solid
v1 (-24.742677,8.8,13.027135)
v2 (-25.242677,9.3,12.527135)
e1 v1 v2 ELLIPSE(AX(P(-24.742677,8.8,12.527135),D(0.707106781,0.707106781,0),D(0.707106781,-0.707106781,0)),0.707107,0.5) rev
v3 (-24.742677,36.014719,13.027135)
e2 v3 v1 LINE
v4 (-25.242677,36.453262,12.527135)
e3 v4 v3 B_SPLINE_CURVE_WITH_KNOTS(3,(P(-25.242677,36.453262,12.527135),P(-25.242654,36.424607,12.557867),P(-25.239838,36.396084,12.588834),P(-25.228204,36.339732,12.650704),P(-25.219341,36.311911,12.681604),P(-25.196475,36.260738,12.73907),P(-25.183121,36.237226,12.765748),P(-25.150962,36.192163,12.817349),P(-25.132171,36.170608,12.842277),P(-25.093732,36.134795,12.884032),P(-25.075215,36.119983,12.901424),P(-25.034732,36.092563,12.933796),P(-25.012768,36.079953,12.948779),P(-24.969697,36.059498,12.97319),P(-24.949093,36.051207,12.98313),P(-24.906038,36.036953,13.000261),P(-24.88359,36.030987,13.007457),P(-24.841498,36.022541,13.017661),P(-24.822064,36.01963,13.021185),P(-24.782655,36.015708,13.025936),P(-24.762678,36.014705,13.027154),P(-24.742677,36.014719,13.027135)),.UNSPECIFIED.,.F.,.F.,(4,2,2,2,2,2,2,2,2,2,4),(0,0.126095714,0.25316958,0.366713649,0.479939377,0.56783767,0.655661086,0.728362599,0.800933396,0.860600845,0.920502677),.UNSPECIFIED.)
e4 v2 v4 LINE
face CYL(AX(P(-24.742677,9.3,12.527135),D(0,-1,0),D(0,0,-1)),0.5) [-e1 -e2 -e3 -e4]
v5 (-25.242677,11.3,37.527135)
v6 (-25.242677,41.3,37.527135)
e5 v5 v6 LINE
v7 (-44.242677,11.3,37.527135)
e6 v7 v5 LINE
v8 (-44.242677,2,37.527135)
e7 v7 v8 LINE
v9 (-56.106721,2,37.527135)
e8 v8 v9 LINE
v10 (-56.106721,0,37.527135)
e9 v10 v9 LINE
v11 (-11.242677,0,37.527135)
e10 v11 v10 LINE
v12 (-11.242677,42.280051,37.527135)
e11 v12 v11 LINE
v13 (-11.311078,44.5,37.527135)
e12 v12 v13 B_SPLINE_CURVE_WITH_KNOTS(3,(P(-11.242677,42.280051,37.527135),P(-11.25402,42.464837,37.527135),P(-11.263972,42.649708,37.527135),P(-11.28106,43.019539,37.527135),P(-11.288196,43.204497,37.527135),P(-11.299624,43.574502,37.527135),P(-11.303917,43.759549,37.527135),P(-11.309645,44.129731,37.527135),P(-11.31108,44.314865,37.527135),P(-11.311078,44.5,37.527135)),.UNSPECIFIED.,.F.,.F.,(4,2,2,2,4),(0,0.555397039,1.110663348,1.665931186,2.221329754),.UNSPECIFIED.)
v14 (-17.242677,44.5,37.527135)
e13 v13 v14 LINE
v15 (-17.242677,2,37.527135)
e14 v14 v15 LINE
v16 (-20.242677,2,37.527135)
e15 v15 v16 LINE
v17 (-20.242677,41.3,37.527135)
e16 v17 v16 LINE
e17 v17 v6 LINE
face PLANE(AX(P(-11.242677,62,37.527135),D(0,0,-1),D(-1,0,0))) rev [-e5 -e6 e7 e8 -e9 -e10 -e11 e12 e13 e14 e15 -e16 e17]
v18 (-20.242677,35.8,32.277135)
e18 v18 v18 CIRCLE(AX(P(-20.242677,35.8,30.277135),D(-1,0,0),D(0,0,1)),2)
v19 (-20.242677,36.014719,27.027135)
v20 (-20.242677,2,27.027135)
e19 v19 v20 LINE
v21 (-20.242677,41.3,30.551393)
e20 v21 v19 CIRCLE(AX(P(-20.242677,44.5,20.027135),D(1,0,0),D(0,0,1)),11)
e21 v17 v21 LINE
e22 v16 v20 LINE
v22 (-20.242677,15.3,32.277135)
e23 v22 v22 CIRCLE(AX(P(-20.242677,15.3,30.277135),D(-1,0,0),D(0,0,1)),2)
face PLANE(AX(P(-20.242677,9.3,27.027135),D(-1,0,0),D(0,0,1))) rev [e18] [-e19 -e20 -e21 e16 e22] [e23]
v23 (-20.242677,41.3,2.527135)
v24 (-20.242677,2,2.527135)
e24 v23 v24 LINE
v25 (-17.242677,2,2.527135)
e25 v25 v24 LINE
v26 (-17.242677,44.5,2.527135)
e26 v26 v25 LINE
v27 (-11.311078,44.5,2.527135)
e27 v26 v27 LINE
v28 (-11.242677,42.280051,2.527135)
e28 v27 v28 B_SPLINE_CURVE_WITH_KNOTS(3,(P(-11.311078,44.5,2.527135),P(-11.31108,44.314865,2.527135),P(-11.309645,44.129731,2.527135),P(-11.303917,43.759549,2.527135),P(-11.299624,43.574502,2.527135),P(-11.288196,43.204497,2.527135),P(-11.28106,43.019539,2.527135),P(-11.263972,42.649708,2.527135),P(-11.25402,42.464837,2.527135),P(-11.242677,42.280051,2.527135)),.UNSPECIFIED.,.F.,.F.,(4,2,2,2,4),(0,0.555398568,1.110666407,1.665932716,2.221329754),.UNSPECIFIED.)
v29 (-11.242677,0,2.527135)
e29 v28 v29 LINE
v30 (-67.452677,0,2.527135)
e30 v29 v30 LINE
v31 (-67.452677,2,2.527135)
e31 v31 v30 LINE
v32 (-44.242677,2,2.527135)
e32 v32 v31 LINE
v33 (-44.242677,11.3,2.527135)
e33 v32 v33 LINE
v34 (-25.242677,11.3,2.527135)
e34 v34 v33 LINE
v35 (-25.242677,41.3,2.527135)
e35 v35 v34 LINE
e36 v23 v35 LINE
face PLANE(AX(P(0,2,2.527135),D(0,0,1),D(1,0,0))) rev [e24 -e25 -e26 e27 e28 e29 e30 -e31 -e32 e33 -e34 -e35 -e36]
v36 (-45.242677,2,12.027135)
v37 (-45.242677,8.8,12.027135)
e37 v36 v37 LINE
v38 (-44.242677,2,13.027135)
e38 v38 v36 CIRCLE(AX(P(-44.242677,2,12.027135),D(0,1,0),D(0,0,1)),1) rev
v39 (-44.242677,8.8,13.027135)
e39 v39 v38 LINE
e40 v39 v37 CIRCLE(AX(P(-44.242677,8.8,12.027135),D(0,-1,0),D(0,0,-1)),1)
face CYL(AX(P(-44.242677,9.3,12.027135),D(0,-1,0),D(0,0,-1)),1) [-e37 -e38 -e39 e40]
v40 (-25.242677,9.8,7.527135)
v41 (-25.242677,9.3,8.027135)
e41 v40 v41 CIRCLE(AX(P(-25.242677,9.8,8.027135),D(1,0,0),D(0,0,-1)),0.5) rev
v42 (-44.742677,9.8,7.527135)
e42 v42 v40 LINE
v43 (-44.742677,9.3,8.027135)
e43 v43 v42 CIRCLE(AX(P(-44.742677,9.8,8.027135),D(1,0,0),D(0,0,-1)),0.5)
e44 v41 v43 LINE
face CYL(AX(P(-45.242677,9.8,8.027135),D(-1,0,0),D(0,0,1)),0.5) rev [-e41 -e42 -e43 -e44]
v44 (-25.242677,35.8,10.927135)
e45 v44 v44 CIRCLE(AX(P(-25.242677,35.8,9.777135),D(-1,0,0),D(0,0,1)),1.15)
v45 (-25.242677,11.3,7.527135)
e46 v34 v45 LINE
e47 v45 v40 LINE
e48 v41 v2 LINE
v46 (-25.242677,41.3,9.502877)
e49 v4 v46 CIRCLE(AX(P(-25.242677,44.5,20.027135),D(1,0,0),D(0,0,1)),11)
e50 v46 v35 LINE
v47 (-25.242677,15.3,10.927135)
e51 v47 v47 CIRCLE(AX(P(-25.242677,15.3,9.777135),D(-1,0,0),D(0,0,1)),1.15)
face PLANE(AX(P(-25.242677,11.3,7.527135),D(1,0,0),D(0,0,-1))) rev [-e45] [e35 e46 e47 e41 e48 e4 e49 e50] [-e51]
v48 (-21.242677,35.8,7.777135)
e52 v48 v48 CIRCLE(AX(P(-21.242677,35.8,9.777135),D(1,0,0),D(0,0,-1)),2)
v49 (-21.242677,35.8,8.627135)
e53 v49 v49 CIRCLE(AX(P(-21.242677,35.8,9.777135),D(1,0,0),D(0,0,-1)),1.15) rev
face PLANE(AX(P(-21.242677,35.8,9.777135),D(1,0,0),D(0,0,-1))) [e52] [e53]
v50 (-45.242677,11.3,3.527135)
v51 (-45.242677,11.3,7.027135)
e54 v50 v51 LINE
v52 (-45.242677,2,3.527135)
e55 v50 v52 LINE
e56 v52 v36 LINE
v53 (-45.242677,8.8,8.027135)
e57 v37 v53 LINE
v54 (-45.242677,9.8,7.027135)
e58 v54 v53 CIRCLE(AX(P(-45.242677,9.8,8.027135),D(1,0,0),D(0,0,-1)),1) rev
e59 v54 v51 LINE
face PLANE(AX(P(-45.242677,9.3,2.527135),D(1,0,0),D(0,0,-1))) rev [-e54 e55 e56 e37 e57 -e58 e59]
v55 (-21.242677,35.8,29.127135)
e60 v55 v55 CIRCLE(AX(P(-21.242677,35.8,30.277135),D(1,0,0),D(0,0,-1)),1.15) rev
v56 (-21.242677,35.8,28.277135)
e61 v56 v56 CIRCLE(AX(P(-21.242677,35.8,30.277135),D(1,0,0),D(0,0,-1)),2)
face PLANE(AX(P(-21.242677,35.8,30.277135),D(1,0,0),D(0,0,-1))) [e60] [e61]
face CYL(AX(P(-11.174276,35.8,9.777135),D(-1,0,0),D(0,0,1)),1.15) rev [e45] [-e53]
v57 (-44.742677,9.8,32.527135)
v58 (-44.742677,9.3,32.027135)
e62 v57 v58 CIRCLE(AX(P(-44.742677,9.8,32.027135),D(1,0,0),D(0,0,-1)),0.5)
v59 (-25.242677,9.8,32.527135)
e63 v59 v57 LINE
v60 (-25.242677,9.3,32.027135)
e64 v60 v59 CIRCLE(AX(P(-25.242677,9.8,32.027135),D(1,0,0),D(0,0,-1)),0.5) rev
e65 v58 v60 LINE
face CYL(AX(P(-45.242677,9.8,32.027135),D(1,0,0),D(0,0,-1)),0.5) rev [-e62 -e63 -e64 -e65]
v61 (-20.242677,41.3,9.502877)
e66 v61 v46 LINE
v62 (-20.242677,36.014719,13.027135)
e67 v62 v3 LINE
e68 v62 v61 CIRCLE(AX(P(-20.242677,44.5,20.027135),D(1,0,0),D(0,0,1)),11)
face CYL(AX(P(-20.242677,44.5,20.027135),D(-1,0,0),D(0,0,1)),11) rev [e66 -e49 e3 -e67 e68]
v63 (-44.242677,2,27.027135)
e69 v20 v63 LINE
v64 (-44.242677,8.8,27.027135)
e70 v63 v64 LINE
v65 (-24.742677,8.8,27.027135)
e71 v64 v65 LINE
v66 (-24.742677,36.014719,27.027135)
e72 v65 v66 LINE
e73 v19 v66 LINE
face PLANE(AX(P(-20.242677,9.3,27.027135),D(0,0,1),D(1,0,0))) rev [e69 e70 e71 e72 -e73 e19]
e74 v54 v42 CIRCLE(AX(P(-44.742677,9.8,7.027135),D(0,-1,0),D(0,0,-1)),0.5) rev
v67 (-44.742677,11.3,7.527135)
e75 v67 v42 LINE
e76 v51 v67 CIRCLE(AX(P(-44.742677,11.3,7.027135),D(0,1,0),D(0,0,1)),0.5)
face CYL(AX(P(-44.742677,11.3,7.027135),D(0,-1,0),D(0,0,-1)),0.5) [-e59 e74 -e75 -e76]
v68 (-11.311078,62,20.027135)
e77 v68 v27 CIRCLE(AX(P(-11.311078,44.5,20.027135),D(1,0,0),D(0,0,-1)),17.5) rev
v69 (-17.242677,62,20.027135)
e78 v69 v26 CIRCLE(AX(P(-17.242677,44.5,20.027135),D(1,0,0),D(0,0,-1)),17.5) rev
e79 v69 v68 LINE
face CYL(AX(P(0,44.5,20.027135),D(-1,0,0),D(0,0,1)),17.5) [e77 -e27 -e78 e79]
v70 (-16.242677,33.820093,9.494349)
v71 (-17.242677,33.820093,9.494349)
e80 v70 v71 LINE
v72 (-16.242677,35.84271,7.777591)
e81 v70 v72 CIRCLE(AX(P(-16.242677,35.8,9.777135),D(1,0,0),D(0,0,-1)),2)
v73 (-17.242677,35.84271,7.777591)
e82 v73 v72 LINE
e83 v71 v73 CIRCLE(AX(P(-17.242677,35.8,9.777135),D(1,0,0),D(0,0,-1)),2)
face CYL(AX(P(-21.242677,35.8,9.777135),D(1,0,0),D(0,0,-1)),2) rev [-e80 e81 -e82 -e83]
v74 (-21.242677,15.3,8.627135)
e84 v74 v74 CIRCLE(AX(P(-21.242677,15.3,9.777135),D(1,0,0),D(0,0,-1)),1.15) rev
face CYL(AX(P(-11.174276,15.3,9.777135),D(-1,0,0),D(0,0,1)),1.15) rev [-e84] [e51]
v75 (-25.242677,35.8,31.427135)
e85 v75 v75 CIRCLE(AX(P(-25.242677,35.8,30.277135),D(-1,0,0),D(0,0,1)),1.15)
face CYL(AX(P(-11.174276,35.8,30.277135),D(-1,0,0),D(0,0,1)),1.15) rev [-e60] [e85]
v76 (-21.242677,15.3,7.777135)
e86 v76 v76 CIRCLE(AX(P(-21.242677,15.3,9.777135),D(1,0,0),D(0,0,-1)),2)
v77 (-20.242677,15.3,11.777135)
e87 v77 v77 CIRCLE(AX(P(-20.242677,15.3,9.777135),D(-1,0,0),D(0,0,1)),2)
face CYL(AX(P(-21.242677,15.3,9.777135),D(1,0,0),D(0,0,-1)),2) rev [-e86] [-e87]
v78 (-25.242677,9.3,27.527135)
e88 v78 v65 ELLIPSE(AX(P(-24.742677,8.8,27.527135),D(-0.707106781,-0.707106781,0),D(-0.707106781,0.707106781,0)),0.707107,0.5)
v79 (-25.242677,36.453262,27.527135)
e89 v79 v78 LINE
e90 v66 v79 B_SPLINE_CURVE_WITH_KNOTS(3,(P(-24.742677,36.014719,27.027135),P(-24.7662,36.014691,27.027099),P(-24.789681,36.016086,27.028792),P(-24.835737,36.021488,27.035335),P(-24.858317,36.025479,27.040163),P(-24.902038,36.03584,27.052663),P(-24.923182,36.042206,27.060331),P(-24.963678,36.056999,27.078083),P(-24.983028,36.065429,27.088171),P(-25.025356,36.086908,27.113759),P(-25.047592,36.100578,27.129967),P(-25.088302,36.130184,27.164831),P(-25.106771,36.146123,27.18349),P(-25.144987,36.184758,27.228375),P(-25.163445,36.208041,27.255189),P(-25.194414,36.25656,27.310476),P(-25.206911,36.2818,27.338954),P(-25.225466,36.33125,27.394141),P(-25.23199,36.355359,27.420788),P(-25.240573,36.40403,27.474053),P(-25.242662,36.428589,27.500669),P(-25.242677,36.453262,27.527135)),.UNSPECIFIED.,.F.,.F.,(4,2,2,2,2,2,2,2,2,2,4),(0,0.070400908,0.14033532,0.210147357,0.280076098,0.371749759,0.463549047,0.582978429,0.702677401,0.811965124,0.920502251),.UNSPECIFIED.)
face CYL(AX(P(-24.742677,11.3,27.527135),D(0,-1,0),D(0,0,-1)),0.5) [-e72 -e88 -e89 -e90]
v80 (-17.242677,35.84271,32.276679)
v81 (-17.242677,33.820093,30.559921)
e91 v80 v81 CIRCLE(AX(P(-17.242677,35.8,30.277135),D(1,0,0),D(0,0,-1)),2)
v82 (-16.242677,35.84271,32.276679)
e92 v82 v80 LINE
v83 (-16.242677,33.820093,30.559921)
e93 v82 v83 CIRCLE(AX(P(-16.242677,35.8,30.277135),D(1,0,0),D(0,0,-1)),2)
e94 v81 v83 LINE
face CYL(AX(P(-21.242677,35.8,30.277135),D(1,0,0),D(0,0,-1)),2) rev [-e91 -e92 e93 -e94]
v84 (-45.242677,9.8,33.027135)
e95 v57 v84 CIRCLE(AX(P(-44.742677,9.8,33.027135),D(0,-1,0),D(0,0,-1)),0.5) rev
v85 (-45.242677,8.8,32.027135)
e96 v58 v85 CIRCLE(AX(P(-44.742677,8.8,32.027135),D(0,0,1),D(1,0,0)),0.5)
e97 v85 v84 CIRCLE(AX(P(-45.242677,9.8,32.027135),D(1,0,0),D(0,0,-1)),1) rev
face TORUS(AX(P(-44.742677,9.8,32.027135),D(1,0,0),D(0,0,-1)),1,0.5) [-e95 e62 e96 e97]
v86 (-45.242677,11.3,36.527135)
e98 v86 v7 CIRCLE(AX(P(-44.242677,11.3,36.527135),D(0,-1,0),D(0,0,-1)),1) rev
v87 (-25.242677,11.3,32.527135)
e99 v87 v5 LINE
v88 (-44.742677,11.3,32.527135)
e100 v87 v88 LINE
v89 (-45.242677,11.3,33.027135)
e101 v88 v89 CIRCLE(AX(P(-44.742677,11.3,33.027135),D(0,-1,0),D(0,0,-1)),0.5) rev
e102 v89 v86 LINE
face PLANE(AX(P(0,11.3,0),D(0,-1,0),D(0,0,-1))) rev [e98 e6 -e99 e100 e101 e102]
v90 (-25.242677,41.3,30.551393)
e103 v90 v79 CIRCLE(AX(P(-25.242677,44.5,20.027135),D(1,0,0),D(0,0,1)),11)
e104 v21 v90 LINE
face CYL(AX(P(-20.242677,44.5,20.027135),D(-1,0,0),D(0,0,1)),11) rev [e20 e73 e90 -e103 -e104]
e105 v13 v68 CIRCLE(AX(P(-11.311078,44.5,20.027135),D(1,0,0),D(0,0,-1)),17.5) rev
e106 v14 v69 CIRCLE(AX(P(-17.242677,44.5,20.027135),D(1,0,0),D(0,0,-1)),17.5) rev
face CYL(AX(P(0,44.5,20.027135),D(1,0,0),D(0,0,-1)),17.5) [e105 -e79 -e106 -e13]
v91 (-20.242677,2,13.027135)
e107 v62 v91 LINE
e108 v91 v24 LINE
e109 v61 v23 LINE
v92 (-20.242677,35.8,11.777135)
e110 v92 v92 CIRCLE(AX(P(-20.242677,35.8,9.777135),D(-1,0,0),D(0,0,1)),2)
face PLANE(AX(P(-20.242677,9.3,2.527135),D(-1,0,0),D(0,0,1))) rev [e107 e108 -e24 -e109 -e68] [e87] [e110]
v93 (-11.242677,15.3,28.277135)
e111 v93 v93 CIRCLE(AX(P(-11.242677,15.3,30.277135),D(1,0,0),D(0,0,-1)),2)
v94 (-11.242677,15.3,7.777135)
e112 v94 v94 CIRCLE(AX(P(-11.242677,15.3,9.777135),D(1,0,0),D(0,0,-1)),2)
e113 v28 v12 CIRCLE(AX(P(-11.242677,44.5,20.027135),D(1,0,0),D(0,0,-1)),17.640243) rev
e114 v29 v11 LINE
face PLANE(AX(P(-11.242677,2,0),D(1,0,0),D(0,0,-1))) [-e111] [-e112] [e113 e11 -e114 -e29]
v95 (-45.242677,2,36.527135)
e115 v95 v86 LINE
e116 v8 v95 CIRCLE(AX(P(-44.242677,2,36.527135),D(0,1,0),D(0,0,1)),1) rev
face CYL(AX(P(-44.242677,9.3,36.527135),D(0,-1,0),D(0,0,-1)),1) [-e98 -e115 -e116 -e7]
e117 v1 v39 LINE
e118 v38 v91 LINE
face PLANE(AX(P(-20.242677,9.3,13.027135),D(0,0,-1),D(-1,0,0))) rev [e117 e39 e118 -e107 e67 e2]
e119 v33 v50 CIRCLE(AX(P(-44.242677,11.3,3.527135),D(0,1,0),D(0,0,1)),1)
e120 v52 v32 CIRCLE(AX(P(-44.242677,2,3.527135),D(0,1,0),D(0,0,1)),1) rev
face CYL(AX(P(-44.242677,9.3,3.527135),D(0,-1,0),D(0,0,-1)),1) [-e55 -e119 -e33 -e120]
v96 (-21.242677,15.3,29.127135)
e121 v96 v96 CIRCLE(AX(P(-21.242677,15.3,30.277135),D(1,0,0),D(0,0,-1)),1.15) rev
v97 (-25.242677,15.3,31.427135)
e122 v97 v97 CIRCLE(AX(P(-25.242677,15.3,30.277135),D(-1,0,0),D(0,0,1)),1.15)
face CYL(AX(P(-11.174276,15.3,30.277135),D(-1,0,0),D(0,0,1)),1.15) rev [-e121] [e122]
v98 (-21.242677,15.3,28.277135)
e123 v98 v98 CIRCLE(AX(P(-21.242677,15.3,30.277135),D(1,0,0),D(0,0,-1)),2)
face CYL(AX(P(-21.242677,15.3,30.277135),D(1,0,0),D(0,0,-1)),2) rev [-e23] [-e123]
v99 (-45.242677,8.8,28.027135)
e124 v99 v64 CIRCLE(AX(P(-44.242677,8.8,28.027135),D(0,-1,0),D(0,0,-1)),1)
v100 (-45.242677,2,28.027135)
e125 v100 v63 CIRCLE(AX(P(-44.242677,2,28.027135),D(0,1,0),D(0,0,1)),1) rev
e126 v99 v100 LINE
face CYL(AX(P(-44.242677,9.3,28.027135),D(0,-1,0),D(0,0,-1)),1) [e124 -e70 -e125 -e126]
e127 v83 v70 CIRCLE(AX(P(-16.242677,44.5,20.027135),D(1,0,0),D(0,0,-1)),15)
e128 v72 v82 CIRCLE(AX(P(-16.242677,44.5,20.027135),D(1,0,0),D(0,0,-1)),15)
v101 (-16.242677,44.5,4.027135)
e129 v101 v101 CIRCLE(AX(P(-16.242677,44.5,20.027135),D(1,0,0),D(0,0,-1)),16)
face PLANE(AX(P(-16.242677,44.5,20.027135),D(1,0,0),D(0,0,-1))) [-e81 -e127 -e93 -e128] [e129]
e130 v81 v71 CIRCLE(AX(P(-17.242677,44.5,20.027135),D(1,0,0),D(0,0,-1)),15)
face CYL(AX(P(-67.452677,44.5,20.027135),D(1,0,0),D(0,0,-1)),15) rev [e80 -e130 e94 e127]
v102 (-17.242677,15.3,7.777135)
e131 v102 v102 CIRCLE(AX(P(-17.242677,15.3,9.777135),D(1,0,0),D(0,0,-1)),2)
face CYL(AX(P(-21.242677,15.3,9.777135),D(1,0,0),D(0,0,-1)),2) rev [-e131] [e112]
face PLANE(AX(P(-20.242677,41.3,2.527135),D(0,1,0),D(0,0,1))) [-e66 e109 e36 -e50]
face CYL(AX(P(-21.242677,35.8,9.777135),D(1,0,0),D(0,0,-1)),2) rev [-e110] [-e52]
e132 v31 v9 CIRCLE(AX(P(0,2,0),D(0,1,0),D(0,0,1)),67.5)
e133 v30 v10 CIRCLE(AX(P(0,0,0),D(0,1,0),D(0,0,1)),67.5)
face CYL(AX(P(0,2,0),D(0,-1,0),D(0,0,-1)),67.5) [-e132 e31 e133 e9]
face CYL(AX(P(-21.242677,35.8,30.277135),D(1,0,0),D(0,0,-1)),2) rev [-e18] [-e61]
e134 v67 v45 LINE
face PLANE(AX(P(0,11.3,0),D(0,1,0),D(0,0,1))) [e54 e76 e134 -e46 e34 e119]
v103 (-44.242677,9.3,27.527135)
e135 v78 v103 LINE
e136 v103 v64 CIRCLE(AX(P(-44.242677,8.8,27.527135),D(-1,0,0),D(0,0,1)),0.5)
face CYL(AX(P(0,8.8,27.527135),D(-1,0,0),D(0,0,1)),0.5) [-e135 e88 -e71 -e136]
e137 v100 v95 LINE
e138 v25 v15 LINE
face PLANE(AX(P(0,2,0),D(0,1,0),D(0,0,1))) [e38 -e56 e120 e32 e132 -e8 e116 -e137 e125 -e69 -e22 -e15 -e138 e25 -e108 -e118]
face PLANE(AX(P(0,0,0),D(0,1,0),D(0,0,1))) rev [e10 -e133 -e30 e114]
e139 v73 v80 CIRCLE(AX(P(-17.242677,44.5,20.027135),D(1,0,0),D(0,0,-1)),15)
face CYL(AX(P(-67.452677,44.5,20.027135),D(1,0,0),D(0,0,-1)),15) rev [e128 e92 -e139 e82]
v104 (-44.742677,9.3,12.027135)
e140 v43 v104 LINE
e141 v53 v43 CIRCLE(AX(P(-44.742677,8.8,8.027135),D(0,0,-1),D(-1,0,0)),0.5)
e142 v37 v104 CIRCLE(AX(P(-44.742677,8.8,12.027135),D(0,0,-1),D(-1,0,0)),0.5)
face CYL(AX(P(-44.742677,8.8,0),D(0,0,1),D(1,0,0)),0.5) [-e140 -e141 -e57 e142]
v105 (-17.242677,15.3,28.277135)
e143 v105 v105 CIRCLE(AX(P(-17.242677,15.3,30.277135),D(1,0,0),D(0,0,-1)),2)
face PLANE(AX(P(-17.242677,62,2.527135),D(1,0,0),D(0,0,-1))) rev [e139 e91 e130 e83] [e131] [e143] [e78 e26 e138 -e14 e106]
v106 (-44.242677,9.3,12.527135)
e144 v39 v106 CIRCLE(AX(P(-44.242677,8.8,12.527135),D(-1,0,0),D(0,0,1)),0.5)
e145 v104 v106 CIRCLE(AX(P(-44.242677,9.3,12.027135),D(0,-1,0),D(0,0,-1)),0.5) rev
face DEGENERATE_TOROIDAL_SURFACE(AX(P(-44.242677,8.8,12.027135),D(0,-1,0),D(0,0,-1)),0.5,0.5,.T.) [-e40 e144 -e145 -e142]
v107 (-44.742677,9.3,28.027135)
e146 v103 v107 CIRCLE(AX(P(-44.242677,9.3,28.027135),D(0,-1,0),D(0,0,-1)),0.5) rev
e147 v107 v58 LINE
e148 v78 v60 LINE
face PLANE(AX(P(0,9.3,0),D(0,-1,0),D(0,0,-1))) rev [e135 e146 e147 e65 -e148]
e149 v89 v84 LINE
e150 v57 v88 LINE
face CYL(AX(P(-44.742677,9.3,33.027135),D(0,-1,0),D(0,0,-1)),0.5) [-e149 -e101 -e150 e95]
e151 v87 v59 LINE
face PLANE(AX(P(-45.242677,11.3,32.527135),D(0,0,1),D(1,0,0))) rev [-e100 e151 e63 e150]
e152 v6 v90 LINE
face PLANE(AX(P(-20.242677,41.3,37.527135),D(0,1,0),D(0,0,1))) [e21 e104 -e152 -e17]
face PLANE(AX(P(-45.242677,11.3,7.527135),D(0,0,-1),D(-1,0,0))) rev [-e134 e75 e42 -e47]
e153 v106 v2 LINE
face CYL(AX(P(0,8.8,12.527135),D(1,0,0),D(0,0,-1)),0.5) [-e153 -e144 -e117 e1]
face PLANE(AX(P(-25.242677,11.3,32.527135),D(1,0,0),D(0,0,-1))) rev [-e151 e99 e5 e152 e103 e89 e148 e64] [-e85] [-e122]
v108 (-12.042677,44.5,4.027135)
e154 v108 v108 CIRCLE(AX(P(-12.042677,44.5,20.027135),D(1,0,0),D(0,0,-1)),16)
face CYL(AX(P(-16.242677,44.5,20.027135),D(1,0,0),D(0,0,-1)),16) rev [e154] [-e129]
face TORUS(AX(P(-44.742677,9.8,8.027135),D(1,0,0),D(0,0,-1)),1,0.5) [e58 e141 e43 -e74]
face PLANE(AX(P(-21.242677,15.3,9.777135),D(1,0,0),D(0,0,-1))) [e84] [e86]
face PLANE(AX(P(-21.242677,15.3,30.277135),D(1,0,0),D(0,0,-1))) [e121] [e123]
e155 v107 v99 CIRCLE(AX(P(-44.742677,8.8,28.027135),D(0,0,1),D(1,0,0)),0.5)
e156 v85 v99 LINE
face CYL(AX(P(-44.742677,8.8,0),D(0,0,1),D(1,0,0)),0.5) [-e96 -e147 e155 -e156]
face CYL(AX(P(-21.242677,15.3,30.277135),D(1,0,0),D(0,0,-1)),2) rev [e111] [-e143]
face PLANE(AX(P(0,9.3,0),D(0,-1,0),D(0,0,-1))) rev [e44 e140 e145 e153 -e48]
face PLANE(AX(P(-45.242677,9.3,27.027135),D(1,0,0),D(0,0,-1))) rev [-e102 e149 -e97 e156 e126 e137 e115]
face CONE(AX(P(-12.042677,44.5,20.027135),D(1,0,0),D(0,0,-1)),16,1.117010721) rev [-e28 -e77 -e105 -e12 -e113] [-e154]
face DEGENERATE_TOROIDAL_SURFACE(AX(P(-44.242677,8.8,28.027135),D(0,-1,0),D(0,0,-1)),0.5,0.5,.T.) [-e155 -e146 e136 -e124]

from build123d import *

# Parameters (mm, degrees)
EXTRUDE_1_DEPTH     = 2
SKETCH_2_W          = 6
SKETCH_2_H          = 35
EXTRUDE_2_DEPTH     = 60
FILLET_1_R          = 17.5
SKETCH_3_R          = 16
CUT_EXTRUDE_1_DEPTH = 5
CHAMFER_1_SIZE      = 1.640243073
CHAMFER_1_SIZE_2    = 0.8
SKETCH_4_R          = 15
CUT_EXTRUDE_2_DEPTH = 105.385422037
SKETCH_5_W          = 25
SKETCH_5_H          = 10.5
EXTRUDE_3_DEPTH     = 7.3
EXTRUDE_4_DEPTH     = 2
FILLET_2_R          = 1
EXTRUDE_5_DEPTH     = 5
SKETCH_9_R          = 1.15
CUT_EXTRUDE_3_DEPTH = 101.277297201
SKETCH_10_R         = 2
CUT_EXTRUDE_4_DEPTH = 10
FILLET_3_R          = 0.5
SKETCH_12_W         = 56.21
SKETCH_12_H         = 29.03
CUT_EXTRUDE_5_DEPTH = 113.159332301


# Some blends are built 0.0001 mm under size
with BuildPart() as part:
    # 스케치1 → 보스-돌출1 (new body)
    with BuildSketch(Plane(origin=(0, 0, 0), x_dir=(1, 0, 0), z_dir=(0, 1, 0))):
        with BuildLine():
            Line((-11.24267666, -2.527135016), (-67.45267666, -2.527135016))
            ThreePointArc((-67.45267666, -2.527135016), (-50.72671765, -44.531450868), (-11.24267666, -66.557135016))
            Line((-11.24267666, -66.557135016), (-11.24267666, -2.527135016))
        make_face()
    extrude(amount=EXTRUDE_1_DEPTH)

    # 스케치2 → 보스-돌출2 (add)
    with BuildSketch(Plane(origin=(0, 2, 0), x_dir=(1, 0, 0), z_dir=(0, 1, 0))):
        with Locations((-14.24267666, -20.027135016)):
            Rectangle(SKETCH_2_W, SKETCH_2_H)
    extrude(amount=EXTRUDE_2_DEPTH)

    # 필렛1
    fillet_1_edges = [part.edges().sort_by_distance(p)[0] for p in [
        (-14.24267666, 62, 2.527135016),
        (-14.24267666, 62, 37.527135016),
    ]]
    fillet(fillet_1_edges, radius=FILLET_1_R - 0.0001)  # a hair under: the kernel refuses the full size

    # 스케치3 → 컷-돌출1 (cut)
    with BuildSketch(Plane(origin=(-11.24267666, 0, 0), x_dir=(0, 0, -1), z_dir=(1, 0, 0))):
        with Locations((-20.027135016, 44.5)):
            Circle(SKETCH_3_R)
    extrude(amount=-CUT_EXTRUDE_1_DEPTH, mode=Mode.SUBTRACT)

    # 모따기1
    # the kernel refuses this chamfer: 1.640243073, 0.8 mm, written as the material it takes off along each edge
    with BuildSketch(Plane(origin=(-11.24267666, 44.5, 20.027135016), x_dir=(0, 0, -1), z_dir=(0, -1, 0))) as chamfer_1_piece_1:
        Polygon((16 + CHAMFER_1_SIZE, 0), (16, -CHAMFER_1_SIZE_2), (16, 0), align=None)
    revolve(axis=Axis((-11.24267666, 44.5, 20.027135016), (1, 0, 0)), mode=Mode.SUBTRACT)

    # 스케치4 → 컷-돌출2 (cut, through all)
    with BuildSketch(Plane(origin=(-16.24267666, 0, 0), x_dir=(0, 0, -1), z_dir=(1, 0, 0))):
        with Locations((-20.027135016, 44.5)):
            Circle(SKETCH_4_R)
    extrude(amount=-CUT_EXTRUDE_2_DEPTH, mode=Mode.SUBTRACT)

    # 스케치5 → 보스-돌출3 (add)
    with BuildSketch(Plane(origin=(0, 2, 0), x_dir=(1, 0, 0), z_dir=(0, 1, 0))):
        with Locations((-32.74267666, -7.777135016)):
            Rectangle(SKETCH_5_W, SKETCH_5_H)
        with Locations((-32.74267666, -32.277135016)):
            Rectangle(SKETCH_5_W, SKETCH_5_H)
    extrude(amount=EXTRUDE_3_DEPTH)

    # 스케치6 → 보스-돌출4 (add)
    with BuildSketch(Plane(origin=(0, 9.3, 0), x_dir=(1, 0, 0), z_dir=(0, 1, 0))):
        Polygon((-45.24267666, -32.527135016), (-25.24267666, -32.527135016), (-25.24267666, -27.027135016), (-20.24267666, -27.027135016), (-20.24267666, -37.527135016), (-45.24267666, -37.527135016), align=None)
        Polygon((-45.24267666, -2.527135016), (-20.24267666, -2.527135016), (-20.24267666, -13.027135016), (-25.24267666, -13.027135016), (-25.24267666, -7.527135016), (-45.24267666, -7.527135016), align=None)
    extrude(amount=EXTRUDE_4_DEPTH)

    # 필렛2
    fillet_2_edges = [part.edges().sort_by_distance(p)[0] for p in [
        (-45.24267666, 6.65, 2.527135016),
        (-45.24267666, 5.65, 13.027135016),
        (-45.24267666, 5.65, 27.027135016),
        (-45.24267666, 6.65, 37.527135016),
    ]]
    fillet(fillet_2_edges, radius=FILLET_2_R)

    # 스케치7 → 보스-돌출5 (add)
    with BuildSketch(Plane.ZY.offset(25.24267666)):
        with BuildLine():
            Line((2.527135016, 11.3), (13.027135016, 11.3))
            Line((13.027135016, 11.3), (13.027135016, 36.014718626))
            ThreePointArc((13.027135016, 36.014718626), (10.875170651, 38.397414624), (9.502877322, 41.3))
            Line((9.502877322, 41.3), (2.527135016, 41.3))
            Line((2.527135016, 41.3), (2.527135016, 11.3))
        make_face()
        with BuildLine():
            Line((37.527135016, 11.3), (27.027135016, 11.3))
            Line((27.027135016, 11.3), (27.027135016, 36.014718626))
            ThreePointArc((27.027135016, 36.014718626), (29.17909938, 38.397414624), (30.551392709, 41.3))
            Line((30.551392709, 41.3), (37.527135016, 41.3))
            Line((37.527135016, 41.3), (37.527135016, 11.3))
        make_face()
    extrude(amount=-EXTRUDE_5_DEPTH)

    # 스케치9 → 컷-돌출3 (cut, through all)
    with BuildSketch(Plane.ZY.offset(25.24267666)):
        with Locations((9.777135016, 35.8)):
            Circle(SKETCH_9_R)
        with Locations((9.777135016, 15.3)):
            Circle(SKETCH_9_R)
        with Locations((30.277135016, 15.3)):
            Circle(SKETCH_9_R)
        with Locations((30.277135016, 35.8)):
            Circle(SKETCH_9_R)
    extrude(amount=-CUT_EXTRUDE_3_DEPTH, mode=Mode.SUBTRACT)

    # 스케치10 → 컷-돌출4 (cut)
    with BuildSketch(Plane(origin=(-11.24267666, 0, 0), x_dir=(0, 0, -1), z_dir=(1, 0, 0))):
        with Locations((-30.277135016, 15.3)):
            Circle(SKETCH_10_R)
        with Locations((-9.777135016, 15.3)):
            Circle(SKETCH_10_R)
        with Locations((-9.777135016, 35.8)):
            Circle(SKETCH_10_R)
        with Locations((-30.277135016, 35.8)):
            Circle(SKETCH_10_R)
    extrude(amount=-CUT_EXTRUDE_4_DEPTH, mode=Mode.SUBTRACT)

    # 필렛3
    fillet_3_edges = [part.edges().sort_by_distance(p)[0] for p in [
        (-45.24267666, 10.3, 32.527135016),
        (-25.24267666, 22.657359313, 27.027135016),
        (-35.24267666, 9.3, 32.527135016),
        (-45.24267666, 9.3, 30.277135016),
        (-44.949783441, 9.3, 27.320028235),
        (-34.74267666, 9.3, 13.027135016),
        (-44.949783441, 9.3, 12.734241797),
        (-45.24267666, 9.3, 9.777135016),
        (-35.24267666, 9.3, 7.527135016),
        (-45.24267666, 10.3, 7.527135016),
        (-25.24267666, 22.657359313, 13.027135016),
        (-34.74267666, 9.3, 27.027135016),
    ]]
    fillet(fillet_3_edges, radius=FILLET_3_R)

    # 스케치12 → 컷-돌출5 (cut, through all)
    with BuildSketch(Plane(origin=(0, 2, 0), x_dir=(1, 0, 0), z_dir=(0, 1, 0))):
        with Locations((-39.34767666, -52.042135016)):
            Rectangle(SKETCH_12_W, SKETCH_12_H)
    extrude(amount=-CUT_EXTRUDE_5_DEPTH, mode=Mode.SUBTRACT)


solid = part.part
